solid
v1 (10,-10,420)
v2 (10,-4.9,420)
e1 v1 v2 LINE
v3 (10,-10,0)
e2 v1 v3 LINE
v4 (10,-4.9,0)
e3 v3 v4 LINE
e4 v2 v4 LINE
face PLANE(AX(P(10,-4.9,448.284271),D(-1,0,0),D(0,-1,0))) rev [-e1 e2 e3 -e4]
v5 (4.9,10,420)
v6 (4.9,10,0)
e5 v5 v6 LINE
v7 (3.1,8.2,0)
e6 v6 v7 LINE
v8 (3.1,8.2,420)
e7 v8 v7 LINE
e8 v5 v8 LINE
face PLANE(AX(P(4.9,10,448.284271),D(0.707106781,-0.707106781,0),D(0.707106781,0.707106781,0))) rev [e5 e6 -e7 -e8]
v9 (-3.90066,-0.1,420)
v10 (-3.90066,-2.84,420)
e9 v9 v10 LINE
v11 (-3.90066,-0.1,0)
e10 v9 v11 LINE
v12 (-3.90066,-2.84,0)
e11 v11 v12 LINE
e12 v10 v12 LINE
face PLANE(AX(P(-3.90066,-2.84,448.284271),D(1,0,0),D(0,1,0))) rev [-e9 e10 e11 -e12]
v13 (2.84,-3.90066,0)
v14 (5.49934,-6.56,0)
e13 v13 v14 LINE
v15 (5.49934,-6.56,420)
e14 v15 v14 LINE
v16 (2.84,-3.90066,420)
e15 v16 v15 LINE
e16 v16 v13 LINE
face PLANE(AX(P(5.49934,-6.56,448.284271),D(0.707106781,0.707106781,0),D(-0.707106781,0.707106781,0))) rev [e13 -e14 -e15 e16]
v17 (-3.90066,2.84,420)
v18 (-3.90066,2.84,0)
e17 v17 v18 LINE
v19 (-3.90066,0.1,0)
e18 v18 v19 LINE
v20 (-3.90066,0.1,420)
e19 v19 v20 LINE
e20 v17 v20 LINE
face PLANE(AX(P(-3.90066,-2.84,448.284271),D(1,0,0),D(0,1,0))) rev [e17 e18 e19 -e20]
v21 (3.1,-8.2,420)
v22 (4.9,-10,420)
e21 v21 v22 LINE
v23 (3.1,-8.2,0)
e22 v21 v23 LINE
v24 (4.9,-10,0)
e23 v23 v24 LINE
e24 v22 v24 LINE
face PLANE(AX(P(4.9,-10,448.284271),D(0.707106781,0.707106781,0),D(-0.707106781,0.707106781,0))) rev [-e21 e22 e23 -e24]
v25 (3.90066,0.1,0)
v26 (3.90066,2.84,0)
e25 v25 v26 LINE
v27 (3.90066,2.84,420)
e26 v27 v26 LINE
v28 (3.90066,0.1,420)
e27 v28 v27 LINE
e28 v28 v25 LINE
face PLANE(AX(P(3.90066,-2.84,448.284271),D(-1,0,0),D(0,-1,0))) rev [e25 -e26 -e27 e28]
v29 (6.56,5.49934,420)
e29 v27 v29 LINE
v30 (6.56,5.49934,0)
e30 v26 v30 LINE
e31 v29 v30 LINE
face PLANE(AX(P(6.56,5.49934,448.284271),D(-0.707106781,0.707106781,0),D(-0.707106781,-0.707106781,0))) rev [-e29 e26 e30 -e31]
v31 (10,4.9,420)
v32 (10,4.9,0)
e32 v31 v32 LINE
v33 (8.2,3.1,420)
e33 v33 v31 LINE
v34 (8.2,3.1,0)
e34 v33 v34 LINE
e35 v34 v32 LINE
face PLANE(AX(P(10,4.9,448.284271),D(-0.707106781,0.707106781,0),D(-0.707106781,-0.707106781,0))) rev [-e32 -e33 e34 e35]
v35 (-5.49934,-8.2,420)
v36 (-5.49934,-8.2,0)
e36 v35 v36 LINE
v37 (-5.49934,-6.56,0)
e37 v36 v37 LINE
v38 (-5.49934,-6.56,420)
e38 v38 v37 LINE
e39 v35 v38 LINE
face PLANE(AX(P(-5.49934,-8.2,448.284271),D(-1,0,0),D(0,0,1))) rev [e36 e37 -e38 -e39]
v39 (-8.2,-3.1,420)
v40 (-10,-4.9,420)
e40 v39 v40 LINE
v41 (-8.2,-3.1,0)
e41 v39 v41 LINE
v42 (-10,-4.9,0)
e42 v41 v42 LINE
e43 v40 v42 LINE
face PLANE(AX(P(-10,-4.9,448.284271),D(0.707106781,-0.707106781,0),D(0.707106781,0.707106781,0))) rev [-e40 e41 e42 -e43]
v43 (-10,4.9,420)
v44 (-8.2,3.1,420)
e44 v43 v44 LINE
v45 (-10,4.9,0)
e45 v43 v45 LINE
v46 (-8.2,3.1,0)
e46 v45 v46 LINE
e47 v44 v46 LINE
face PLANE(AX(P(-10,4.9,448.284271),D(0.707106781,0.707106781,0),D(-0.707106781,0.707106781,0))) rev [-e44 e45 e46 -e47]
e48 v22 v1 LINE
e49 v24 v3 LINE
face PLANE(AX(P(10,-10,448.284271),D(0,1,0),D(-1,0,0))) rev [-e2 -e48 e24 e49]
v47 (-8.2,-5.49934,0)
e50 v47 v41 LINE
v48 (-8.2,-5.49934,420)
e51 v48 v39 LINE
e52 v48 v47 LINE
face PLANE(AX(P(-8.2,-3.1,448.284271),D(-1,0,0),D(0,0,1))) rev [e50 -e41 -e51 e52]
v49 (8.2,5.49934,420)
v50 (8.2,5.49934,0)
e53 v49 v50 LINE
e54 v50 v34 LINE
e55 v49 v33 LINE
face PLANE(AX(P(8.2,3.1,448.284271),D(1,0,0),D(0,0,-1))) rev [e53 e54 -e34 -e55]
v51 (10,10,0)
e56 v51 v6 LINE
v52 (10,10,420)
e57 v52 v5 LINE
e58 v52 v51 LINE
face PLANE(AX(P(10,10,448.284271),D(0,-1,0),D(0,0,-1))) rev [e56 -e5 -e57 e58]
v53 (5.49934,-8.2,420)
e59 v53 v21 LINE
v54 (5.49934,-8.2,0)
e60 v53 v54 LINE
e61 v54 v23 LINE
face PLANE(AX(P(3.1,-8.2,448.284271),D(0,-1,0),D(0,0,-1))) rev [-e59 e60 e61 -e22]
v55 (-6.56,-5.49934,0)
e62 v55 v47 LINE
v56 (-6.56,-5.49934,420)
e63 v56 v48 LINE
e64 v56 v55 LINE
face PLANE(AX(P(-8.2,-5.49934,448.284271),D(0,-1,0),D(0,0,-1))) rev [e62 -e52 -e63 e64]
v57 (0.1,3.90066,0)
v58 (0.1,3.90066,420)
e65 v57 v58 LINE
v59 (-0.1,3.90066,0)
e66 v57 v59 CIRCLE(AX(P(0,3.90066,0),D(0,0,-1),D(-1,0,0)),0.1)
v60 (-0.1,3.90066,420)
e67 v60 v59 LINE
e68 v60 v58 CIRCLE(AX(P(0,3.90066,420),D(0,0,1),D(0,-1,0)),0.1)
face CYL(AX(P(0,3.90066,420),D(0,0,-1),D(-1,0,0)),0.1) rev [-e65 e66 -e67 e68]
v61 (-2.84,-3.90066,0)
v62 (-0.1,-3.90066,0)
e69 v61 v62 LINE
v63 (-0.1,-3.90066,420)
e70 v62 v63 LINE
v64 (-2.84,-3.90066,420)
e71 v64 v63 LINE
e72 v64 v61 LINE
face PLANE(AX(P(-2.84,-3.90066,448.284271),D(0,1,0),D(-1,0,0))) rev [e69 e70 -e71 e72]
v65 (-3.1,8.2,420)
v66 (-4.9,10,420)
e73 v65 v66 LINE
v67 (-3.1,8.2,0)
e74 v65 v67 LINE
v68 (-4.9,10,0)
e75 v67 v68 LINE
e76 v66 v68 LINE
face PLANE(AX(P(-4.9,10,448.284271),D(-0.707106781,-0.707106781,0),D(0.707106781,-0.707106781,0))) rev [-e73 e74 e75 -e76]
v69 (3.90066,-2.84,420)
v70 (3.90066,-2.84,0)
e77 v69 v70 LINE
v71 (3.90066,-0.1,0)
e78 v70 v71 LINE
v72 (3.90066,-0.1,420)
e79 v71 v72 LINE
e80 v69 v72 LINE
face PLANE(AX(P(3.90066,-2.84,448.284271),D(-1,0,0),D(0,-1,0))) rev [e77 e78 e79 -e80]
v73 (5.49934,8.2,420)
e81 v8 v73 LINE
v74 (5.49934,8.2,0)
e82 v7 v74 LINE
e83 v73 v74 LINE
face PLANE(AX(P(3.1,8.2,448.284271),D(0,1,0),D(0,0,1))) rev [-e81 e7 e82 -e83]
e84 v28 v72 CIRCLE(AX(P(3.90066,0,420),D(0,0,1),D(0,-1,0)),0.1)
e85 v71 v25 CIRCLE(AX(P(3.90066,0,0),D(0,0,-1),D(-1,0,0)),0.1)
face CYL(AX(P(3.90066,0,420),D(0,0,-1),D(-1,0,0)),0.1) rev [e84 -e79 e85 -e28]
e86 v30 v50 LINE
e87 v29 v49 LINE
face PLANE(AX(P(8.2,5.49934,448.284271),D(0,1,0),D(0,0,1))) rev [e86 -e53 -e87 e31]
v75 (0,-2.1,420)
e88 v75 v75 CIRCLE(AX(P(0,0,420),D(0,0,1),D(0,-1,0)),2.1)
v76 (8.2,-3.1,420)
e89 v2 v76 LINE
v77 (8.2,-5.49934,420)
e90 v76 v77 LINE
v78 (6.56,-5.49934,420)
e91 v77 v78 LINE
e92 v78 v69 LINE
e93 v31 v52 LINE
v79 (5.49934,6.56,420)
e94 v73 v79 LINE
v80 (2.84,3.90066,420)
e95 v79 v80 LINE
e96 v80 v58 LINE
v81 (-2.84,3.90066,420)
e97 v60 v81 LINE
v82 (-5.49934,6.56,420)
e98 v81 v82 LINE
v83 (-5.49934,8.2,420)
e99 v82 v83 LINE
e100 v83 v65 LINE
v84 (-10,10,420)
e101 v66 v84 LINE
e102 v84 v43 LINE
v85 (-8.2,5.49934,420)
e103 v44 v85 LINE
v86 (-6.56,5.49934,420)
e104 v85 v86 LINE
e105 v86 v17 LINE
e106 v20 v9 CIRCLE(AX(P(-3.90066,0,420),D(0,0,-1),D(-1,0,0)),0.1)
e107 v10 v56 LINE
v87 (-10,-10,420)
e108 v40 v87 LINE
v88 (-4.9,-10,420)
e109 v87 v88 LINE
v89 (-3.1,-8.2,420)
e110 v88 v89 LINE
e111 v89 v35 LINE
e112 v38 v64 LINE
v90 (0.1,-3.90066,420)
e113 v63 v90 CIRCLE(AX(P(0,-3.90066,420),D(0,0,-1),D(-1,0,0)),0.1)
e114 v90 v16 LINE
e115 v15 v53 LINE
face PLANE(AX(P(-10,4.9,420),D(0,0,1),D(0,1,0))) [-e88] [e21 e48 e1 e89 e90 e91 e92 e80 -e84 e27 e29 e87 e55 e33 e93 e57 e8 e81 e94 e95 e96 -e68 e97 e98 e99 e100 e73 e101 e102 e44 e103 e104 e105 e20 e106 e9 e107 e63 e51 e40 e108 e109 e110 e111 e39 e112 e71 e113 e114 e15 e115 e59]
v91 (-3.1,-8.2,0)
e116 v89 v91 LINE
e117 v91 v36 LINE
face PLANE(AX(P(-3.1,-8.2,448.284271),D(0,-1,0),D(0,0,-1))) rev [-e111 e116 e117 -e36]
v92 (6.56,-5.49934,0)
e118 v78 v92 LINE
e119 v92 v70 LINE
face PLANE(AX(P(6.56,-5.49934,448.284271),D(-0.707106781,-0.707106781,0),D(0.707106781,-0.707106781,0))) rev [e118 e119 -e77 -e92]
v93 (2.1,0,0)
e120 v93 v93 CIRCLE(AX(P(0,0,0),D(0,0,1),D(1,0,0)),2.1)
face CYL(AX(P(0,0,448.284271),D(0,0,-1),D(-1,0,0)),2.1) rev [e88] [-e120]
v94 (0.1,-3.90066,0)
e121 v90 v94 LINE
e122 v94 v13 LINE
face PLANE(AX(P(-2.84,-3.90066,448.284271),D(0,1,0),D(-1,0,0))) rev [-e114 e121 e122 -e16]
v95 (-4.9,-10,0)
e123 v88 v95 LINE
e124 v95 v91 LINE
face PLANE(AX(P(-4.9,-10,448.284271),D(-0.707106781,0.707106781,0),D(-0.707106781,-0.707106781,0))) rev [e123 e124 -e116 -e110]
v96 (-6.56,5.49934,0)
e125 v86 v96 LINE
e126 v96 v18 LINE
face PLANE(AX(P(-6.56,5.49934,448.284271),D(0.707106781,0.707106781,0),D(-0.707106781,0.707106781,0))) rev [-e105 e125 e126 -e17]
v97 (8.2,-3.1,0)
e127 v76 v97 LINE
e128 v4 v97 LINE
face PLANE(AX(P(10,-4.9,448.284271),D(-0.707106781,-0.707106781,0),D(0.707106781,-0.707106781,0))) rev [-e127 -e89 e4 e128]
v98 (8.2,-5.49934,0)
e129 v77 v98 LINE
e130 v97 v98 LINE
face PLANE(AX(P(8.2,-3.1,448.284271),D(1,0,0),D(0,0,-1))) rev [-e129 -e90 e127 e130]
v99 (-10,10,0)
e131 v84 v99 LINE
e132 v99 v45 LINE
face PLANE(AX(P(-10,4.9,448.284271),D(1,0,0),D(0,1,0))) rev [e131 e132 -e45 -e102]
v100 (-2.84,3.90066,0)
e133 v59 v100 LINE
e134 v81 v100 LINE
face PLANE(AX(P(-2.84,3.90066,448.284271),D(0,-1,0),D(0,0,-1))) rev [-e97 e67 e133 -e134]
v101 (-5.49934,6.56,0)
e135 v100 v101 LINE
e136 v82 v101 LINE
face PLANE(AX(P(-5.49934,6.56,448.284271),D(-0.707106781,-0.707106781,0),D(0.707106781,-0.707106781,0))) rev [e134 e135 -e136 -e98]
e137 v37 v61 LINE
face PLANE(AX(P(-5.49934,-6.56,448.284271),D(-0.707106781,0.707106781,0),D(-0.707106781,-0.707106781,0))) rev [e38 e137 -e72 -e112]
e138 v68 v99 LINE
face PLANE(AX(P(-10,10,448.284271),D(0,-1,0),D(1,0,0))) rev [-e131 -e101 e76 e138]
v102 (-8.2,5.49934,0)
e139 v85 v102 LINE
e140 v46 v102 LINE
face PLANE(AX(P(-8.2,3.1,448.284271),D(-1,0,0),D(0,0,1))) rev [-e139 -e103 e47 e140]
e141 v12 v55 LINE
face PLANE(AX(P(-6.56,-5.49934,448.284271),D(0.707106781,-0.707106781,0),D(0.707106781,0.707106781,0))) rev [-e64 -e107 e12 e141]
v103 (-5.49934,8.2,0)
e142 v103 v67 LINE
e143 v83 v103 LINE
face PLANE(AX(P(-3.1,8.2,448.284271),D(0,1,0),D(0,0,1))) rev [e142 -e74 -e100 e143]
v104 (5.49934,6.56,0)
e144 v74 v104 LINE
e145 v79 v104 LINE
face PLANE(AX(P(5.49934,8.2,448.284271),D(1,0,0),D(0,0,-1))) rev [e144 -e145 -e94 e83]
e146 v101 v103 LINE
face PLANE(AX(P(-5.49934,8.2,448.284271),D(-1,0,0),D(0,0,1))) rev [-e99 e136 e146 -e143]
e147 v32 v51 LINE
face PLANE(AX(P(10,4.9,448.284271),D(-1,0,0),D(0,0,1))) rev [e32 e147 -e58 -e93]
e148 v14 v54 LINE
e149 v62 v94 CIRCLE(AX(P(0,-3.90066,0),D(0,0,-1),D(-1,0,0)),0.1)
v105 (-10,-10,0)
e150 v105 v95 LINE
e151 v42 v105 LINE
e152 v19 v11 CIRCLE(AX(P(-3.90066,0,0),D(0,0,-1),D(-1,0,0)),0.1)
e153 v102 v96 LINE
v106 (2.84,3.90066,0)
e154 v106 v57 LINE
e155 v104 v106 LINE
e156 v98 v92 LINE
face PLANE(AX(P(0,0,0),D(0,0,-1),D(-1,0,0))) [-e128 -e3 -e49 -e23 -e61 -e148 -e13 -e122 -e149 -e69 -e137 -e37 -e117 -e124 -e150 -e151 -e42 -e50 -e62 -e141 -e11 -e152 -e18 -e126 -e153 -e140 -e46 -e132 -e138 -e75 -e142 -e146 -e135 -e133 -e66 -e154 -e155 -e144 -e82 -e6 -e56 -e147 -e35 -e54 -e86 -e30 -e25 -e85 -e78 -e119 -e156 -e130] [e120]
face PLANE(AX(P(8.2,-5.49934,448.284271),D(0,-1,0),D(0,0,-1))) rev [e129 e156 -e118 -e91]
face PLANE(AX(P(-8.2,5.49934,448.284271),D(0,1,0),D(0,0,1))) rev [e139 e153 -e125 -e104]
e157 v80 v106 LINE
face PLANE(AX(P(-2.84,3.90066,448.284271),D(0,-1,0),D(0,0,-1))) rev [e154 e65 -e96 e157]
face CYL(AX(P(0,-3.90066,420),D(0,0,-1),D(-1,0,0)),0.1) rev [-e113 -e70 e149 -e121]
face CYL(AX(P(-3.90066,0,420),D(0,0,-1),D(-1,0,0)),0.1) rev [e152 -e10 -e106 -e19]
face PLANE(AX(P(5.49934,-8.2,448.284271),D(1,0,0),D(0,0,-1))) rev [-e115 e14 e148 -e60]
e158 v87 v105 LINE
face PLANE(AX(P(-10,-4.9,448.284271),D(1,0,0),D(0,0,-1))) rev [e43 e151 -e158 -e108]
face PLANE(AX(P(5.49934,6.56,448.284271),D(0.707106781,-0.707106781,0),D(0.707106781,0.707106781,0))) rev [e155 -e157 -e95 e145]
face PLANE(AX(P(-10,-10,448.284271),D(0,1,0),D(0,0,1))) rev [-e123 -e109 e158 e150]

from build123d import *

# Parameters (mm, degrees)
SKETCH1_R           = 2.1
BOSS_EXTRUDE1_DEPTH = 420
CUT_EXTRUDE1_DEPTH  = 420


# Read off the part's stored shape, not the designer's step: Cut-Extrude1
with BuildPart() as part:
    # Sketch1 → Boss-Extrude1 (new body)
    with BuildSketch(Plane.XY):
        Polygon((-10, -4.9), (-10, -10), (-4.9, -10), (-3.1, -8.2), (-5.499339828, -8.2), (-5.499339828, -6.56), (-2.84, -3.900660172), (2.84, -3.900660172), (5.499339828, -6.56), (5.499339828, -8.2), (3.1, -8.2), (4.9, -10), (10, -10), (10, -4.9), (8.2, -3.1), (8.2, -5.499339828), (6.56, -5.499339828), (3.900660172, -2.84), (3.900660172, 2.84), (6.56, 5.499339828), (8.2, 5.499339828), (8.2, 3.1), (10, 4.9), (10, 10), (4.9, 10), (3.1, 8.2), (5.499339828, 8.2), (5.499339828, 6.56), (2.84, 3.900660172), (-2.84, 3.900660172), (-5.499339828, 6.56), (-5.499339828, 8.2), (-3.1, 8.2), (-4.9, 10), (-10, 10), (-10, 4.9), (-8.2, 3.1), (-8.2, 5.499339828), (-6.56, 5.499339828), (-3.900660172, 2.84), (-3.900660172, -2.84), (-6.56, -5.499339828), (-8.2, -5.499339828), (-8.2, -3.1), align=None)
        with Locations(Location((0, 0, 0), (0, 0, 270))):
            Circle(SKETCH1_R, mode=Mode.SUBTRACT)
    extrude(amount=BOSS_EXTRUDE1_DEPTH)

    # Cut-Extrude1 outline → Cut-Extrude1 (cut)
    with BuildSketch(Plane.XY):
        with BuildLine():
            ThreePointArc((3.900660172, 0.1), (3.800660172, 0), (3.900660172, -0.1))
            Line((3.900660172, -0.1), (3.900660172, 0.1))
        make_face()
        with BuildLine():
            ThreePointArc((0.1, -3.900660172), (0, -3.800660172), (-0.1, -3.900660172))
            Line((-0.1, -3.900660172), (0.1, -3.900660172))
        make_face()
        with BuildLine():
            ThreePointArc((-3.900660172, -0.1), (-3.800660172, 0), (-3.900660172, 0.1))
            Line((-3.900660172, 0.1), (-3.900660172, -0.1))
        make_face()
        with BuildLine():
            ThreePointArc((-0.1, 3.900660172), (0, 3.800660172), (0.1, 3.900660172))
            Line((0.1, 3.900660172), (-0.1, 3.900660172))
        make_face()
    extrude(amount=CUT_EXTRUDE1_DEPTH, mode=Mode.SUBTRACT)


solid = part.part
